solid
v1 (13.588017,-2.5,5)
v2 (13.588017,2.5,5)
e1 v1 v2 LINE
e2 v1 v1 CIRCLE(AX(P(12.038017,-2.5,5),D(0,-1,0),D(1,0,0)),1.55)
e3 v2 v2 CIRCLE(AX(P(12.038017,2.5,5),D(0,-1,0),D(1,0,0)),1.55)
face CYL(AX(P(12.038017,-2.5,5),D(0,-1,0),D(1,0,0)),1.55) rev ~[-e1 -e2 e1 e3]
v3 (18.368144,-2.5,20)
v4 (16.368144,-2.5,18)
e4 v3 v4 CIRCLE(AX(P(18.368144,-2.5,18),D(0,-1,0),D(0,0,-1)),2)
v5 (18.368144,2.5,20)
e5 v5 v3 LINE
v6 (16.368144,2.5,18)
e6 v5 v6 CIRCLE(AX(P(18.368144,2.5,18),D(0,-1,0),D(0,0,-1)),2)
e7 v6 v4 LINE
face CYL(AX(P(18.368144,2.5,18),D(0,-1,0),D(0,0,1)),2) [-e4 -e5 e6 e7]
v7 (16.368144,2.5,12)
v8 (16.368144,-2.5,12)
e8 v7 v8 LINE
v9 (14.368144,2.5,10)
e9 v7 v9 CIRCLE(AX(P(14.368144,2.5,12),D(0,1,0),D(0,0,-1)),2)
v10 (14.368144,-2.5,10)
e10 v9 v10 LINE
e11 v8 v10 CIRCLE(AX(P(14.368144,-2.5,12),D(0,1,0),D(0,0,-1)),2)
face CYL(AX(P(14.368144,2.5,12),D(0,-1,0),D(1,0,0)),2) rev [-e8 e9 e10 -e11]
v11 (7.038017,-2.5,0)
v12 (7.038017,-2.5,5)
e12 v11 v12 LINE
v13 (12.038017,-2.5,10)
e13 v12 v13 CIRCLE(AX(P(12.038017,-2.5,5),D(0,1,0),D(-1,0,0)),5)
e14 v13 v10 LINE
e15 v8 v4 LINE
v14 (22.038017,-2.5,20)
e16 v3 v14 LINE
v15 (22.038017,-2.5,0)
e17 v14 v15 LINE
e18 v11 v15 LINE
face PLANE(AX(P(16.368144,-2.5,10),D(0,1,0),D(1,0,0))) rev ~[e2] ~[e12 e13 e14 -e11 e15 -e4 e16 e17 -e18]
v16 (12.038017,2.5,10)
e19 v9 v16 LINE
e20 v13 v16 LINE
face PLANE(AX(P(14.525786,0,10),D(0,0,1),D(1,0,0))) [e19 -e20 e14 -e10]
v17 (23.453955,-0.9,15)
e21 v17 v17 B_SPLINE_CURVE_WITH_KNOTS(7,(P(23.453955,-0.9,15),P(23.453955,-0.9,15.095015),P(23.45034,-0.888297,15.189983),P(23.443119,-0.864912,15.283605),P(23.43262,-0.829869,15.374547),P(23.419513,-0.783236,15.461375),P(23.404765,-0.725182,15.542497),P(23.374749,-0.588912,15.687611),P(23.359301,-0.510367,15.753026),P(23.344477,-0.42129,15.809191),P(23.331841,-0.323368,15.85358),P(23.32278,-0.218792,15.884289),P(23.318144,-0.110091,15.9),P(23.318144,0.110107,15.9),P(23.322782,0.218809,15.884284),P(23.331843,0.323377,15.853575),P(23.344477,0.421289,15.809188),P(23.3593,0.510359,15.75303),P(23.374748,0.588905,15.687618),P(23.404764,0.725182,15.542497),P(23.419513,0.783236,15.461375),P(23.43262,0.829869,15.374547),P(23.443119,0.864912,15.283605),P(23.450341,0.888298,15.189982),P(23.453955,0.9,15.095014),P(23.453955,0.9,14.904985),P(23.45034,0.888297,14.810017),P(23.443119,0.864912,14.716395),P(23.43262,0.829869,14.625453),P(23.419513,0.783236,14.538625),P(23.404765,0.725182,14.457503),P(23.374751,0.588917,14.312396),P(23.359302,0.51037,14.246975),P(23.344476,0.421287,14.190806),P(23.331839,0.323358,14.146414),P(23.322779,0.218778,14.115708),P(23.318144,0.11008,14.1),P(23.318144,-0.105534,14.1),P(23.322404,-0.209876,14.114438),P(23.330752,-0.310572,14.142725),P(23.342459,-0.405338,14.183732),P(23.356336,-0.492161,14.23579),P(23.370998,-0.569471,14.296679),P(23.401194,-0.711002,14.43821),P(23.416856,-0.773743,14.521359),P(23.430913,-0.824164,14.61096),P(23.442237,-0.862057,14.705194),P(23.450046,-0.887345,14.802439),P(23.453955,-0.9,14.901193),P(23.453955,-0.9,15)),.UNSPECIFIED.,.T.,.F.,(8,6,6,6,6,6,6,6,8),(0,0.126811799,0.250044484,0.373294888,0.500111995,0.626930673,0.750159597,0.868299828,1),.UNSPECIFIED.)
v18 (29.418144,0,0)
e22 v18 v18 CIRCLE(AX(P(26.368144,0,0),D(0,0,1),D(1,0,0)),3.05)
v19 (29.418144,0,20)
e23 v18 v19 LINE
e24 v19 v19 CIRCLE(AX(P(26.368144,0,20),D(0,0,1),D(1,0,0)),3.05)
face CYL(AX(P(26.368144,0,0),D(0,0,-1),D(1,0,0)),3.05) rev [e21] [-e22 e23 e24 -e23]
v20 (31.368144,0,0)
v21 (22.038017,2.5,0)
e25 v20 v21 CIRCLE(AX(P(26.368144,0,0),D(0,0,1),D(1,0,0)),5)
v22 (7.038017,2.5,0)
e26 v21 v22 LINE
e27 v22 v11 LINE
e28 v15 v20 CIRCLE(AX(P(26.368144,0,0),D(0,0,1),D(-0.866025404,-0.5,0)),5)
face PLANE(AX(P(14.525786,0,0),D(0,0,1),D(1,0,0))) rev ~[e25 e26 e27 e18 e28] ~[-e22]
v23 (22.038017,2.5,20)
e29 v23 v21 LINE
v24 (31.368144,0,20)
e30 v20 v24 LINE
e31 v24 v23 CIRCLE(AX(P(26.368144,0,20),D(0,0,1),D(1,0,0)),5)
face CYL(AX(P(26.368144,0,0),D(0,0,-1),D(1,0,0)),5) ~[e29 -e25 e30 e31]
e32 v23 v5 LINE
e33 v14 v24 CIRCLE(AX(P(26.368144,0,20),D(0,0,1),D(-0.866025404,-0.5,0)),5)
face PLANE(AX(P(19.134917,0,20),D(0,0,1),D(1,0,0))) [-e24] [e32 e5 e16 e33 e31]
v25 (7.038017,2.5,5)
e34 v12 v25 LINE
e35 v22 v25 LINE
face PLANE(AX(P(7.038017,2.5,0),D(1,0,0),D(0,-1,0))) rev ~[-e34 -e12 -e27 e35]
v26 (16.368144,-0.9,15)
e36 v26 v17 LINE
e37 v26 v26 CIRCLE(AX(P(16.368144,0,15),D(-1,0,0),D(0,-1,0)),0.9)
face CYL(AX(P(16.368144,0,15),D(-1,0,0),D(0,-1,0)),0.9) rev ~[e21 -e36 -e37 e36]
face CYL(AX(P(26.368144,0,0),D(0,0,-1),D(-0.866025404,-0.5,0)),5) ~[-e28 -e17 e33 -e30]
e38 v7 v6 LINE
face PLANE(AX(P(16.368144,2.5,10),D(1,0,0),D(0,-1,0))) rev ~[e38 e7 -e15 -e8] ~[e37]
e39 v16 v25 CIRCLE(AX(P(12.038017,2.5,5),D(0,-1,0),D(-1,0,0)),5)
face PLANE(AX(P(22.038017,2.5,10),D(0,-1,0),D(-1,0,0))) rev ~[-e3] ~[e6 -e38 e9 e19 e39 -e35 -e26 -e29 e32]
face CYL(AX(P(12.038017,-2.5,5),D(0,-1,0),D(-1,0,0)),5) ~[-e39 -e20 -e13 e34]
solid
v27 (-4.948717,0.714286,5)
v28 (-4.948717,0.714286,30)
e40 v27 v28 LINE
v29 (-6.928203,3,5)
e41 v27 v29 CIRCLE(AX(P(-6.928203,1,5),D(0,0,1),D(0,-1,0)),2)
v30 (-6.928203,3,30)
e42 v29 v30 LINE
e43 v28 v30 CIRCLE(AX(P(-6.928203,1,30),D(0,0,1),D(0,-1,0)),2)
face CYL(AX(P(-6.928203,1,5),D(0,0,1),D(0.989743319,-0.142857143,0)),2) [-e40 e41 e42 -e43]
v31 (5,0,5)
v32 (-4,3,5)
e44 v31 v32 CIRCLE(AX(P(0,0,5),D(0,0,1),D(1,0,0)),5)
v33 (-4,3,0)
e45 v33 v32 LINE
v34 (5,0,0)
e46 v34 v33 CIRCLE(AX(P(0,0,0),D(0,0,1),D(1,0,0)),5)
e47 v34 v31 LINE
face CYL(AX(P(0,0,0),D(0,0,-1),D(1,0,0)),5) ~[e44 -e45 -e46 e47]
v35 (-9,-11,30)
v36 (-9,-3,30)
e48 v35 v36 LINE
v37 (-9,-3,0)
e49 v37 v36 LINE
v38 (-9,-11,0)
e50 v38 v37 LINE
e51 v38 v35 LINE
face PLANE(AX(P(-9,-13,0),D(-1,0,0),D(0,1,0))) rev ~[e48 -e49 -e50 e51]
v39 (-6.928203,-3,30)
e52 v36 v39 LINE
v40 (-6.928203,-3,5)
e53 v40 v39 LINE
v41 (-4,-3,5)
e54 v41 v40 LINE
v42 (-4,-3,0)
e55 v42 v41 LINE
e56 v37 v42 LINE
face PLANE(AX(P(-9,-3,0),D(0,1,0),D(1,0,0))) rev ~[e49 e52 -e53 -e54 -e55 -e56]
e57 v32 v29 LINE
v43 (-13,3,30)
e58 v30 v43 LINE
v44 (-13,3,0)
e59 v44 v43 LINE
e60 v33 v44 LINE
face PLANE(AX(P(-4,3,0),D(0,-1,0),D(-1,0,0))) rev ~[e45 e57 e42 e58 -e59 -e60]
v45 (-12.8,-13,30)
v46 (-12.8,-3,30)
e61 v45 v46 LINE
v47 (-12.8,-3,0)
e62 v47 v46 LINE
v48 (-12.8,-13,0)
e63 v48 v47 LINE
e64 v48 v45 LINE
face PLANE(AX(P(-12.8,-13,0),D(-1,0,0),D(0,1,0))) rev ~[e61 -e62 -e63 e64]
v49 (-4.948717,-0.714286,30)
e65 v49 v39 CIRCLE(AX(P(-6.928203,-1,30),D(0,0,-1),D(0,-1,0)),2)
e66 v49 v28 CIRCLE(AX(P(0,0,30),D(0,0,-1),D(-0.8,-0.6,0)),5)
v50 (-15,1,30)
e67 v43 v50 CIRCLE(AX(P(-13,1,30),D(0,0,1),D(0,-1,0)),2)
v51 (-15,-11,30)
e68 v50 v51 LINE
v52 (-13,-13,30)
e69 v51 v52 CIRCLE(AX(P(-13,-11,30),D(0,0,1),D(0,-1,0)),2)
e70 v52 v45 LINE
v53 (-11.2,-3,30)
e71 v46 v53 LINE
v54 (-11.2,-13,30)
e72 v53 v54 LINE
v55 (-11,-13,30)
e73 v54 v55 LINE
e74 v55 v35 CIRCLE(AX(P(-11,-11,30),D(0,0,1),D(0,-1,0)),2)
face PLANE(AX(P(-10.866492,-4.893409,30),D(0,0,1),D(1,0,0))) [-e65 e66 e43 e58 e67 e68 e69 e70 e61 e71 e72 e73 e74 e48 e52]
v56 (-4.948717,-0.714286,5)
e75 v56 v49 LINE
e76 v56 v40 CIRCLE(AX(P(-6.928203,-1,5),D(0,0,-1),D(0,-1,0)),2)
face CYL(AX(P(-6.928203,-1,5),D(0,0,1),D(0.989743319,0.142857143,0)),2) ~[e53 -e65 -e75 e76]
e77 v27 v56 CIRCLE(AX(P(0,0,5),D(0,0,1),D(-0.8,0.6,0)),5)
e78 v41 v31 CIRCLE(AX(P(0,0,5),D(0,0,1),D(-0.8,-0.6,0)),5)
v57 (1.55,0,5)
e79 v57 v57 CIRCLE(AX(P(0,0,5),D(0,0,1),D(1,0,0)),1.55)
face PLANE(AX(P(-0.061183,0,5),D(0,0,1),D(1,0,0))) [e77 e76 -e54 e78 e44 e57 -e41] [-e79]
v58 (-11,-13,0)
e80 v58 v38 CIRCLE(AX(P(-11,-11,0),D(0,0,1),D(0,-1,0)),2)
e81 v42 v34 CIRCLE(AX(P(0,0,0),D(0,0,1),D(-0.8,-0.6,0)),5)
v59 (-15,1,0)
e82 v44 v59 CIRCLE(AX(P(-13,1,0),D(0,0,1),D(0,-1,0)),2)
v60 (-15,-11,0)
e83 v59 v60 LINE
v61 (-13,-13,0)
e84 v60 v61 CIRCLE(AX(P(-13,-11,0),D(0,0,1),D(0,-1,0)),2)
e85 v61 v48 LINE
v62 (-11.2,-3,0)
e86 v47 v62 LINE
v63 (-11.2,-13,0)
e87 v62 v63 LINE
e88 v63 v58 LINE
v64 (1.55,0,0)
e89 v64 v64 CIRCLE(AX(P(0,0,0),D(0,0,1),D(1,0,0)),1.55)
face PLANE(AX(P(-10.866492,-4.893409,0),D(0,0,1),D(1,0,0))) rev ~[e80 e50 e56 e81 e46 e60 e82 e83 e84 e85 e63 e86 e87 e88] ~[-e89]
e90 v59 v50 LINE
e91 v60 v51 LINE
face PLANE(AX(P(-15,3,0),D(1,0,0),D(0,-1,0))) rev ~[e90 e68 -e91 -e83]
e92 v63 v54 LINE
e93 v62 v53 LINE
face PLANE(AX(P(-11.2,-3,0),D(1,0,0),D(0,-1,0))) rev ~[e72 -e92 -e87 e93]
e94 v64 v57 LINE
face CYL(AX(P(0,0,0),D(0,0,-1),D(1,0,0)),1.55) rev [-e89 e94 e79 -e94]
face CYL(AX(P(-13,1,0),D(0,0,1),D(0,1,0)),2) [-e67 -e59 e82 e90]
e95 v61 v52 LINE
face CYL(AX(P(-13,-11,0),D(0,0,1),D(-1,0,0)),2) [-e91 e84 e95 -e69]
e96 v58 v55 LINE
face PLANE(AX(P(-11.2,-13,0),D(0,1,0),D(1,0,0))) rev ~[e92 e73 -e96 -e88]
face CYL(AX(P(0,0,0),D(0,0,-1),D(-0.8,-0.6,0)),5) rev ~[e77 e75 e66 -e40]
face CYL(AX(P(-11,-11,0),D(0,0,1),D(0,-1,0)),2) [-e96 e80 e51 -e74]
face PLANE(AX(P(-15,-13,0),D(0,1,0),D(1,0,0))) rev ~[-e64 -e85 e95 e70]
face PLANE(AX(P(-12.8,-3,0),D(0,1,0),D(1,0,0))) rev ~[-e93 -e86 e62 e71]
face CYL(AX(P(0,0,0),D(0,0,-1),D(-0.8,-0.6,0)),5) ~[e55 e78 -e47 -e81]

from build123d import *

# Parameters (mm, degrees)
F0_R      = 1.55
F1_DEPTH  = 5
F2_DEPTH  = 30
F3_R      = 2
F4_R      = 3.05
F5_DEPTH  = 20
F6_DEPTH  = 10
F7_R      = 1.55
F8_DEPTH  = 25
F10_DEPTH = 10
F11_R     = 0.9
F12_DEPTH = 10
F13_R     = 2


with BuildPart() as f1:
    # F0 (on Top) → F1 (new body)
    with BuildSketch(Plane.XY):
        with BuildLine():
            ThreePointArc((-4, -3), (1.5811388301, -4.7434164903), (5, 0))
            ThreePointArc((5, 0), (1.5811388301, 4.7434164903), (-4, 3))
            ThreePointArc((-4, 3), (-5, 0), (-4, -3))
        make_face()
        Circle(F0_R, mode=Mode.SUBTRACT)
    extrude(amount=F1_DEPTH)

    # F0 (on Top) → F2 (join)
    with BuildSketch(Plane.XY):
        with BuildLine():
            ThreePointArc((-4, -3), (-5, 0), (-4, 3))
            Line((-4, 3), (-15, 3))
            Line((-15, 3), (-15, -13))
            Line((-15, -13), (-12.8, -13))
            Line((-12.8, -13), (-12.8, -3))
            Line((-12.8, -3), (-11.2, -3))
            Line((-11.2, -3), (-11.2, -13))
            Line((-11.2, -13), (-9, -13))
            Line((-9, -13), (-9, -3))
            Line((-9, -3), (-4, -3))
        make_face()
    extrude(amount=F2_DEPTH)

    # F3
    f3_edges = [f1.edges().sort_by_distance(p)[0] for p in [
        (-4, 3, 17.5),
        (-4, -3, 17.5),
        (-15, 3, 15),
        (-9, -13, 15),
        (-15, -13, 15),
    ]]
    fillet(f3_edges, radius=F3_R)


with BuildPart() as f5:
    # F4 (on Top) → F5 (new body)
    with BuildSketch(Plane.XY):
        with BuildLine():
            ThreePointArc((22.0380171016, -2.5), (27.662239346, -4.8296291314), (31.3681441205, 0))
            ThreePointArc((31.3681441205, 0), (27.662239346, 4.8296291314), (22.0380171016, 2.5))
            ThreePointArc((22.0380171016, 2.5), (21.3681441205, 0), (22.0380171016, -2.5))
        make_face()
        with Locations((26.3681441205, 0)):
            Circle(F4_R, mode=Mode.SUBTRACT)
    extrude(amount=F5_DEPTH)

    # F4 (on Top) → F6 (join)
    with BuildSketch(Plane.XY):
        with BuildLine():
            ThreePointArc((22.0380171016, -2.5), (21.3681441205, 0), (22.0380171016, 2.5))
            Line((22.0380171016, 2.5), (7.0380171016, 2.5))
            Line((7.0380171016, 2.5), (7.0380171016, -2.5))
            Line((7.0380171016, -2.5), (22.0380171016, -2.5))
        make_face()
    extrude(amount=F6_DEPTH)

    # F7 (on face) → F8 (cut)
    with BuildSketch(Plane.XZ.offset(2.5)):
        with BuildLine():
            ThreePointArc((7.0380171016, 5), (8.5024831957, 8.5355339059), (12.0380171016, 10))
            Line((12.0380171016, 10), (7.0380171016, 10))
            Line((7.0380171016, 10), (7.0380171016, 5))
        make_face()
        with Locations((12.0380171016, 5)):
            Circle(F7_R)
    extrude(amount=-F8_DEPTH, mode=Mode.SUBTRACT)

    # F9 (on face) → F10 (join)
    with BuildSketch(Plane.XY.offset(10)):
        with BuildLine():
            Line((22.0380171016, 2.5), (16.3681441205, 2.5))
            Line((16.3681441205, 2.5), (16.3681441205, -2.5))
            Line((16.3681441205, -2.5), (22.0380171016, -2.5))
            ThreePointArc((22.0380171016, -2.5), (21.3681441205, 0), (22.0380171016, 2.5))
        make_face()
    extrude(amount=F10_DEPTH)

    # F11 (on face) → F12 (cut)
    with BuildSketch(Plane(origin=(16.3681441205, 0, 0), x_dir=(0, -1, 0), z_dir=(-1, 0, 0))):
        with Locations((0, 15)):
            Circle(F11_R)
    extrude(amount=-F12_DEPTH, mode=Mode.SUBTRACT)

    # F13
    f13_edges = [f5.edges().sort_by_distance(p)[0] for p in [
        (16.368144, 0, 20),
        (16.368144, 0, 10),
    ]]
    fillet(f13_edges, radius=F13_R)


solid = Compound([f1.part, f5.part])
